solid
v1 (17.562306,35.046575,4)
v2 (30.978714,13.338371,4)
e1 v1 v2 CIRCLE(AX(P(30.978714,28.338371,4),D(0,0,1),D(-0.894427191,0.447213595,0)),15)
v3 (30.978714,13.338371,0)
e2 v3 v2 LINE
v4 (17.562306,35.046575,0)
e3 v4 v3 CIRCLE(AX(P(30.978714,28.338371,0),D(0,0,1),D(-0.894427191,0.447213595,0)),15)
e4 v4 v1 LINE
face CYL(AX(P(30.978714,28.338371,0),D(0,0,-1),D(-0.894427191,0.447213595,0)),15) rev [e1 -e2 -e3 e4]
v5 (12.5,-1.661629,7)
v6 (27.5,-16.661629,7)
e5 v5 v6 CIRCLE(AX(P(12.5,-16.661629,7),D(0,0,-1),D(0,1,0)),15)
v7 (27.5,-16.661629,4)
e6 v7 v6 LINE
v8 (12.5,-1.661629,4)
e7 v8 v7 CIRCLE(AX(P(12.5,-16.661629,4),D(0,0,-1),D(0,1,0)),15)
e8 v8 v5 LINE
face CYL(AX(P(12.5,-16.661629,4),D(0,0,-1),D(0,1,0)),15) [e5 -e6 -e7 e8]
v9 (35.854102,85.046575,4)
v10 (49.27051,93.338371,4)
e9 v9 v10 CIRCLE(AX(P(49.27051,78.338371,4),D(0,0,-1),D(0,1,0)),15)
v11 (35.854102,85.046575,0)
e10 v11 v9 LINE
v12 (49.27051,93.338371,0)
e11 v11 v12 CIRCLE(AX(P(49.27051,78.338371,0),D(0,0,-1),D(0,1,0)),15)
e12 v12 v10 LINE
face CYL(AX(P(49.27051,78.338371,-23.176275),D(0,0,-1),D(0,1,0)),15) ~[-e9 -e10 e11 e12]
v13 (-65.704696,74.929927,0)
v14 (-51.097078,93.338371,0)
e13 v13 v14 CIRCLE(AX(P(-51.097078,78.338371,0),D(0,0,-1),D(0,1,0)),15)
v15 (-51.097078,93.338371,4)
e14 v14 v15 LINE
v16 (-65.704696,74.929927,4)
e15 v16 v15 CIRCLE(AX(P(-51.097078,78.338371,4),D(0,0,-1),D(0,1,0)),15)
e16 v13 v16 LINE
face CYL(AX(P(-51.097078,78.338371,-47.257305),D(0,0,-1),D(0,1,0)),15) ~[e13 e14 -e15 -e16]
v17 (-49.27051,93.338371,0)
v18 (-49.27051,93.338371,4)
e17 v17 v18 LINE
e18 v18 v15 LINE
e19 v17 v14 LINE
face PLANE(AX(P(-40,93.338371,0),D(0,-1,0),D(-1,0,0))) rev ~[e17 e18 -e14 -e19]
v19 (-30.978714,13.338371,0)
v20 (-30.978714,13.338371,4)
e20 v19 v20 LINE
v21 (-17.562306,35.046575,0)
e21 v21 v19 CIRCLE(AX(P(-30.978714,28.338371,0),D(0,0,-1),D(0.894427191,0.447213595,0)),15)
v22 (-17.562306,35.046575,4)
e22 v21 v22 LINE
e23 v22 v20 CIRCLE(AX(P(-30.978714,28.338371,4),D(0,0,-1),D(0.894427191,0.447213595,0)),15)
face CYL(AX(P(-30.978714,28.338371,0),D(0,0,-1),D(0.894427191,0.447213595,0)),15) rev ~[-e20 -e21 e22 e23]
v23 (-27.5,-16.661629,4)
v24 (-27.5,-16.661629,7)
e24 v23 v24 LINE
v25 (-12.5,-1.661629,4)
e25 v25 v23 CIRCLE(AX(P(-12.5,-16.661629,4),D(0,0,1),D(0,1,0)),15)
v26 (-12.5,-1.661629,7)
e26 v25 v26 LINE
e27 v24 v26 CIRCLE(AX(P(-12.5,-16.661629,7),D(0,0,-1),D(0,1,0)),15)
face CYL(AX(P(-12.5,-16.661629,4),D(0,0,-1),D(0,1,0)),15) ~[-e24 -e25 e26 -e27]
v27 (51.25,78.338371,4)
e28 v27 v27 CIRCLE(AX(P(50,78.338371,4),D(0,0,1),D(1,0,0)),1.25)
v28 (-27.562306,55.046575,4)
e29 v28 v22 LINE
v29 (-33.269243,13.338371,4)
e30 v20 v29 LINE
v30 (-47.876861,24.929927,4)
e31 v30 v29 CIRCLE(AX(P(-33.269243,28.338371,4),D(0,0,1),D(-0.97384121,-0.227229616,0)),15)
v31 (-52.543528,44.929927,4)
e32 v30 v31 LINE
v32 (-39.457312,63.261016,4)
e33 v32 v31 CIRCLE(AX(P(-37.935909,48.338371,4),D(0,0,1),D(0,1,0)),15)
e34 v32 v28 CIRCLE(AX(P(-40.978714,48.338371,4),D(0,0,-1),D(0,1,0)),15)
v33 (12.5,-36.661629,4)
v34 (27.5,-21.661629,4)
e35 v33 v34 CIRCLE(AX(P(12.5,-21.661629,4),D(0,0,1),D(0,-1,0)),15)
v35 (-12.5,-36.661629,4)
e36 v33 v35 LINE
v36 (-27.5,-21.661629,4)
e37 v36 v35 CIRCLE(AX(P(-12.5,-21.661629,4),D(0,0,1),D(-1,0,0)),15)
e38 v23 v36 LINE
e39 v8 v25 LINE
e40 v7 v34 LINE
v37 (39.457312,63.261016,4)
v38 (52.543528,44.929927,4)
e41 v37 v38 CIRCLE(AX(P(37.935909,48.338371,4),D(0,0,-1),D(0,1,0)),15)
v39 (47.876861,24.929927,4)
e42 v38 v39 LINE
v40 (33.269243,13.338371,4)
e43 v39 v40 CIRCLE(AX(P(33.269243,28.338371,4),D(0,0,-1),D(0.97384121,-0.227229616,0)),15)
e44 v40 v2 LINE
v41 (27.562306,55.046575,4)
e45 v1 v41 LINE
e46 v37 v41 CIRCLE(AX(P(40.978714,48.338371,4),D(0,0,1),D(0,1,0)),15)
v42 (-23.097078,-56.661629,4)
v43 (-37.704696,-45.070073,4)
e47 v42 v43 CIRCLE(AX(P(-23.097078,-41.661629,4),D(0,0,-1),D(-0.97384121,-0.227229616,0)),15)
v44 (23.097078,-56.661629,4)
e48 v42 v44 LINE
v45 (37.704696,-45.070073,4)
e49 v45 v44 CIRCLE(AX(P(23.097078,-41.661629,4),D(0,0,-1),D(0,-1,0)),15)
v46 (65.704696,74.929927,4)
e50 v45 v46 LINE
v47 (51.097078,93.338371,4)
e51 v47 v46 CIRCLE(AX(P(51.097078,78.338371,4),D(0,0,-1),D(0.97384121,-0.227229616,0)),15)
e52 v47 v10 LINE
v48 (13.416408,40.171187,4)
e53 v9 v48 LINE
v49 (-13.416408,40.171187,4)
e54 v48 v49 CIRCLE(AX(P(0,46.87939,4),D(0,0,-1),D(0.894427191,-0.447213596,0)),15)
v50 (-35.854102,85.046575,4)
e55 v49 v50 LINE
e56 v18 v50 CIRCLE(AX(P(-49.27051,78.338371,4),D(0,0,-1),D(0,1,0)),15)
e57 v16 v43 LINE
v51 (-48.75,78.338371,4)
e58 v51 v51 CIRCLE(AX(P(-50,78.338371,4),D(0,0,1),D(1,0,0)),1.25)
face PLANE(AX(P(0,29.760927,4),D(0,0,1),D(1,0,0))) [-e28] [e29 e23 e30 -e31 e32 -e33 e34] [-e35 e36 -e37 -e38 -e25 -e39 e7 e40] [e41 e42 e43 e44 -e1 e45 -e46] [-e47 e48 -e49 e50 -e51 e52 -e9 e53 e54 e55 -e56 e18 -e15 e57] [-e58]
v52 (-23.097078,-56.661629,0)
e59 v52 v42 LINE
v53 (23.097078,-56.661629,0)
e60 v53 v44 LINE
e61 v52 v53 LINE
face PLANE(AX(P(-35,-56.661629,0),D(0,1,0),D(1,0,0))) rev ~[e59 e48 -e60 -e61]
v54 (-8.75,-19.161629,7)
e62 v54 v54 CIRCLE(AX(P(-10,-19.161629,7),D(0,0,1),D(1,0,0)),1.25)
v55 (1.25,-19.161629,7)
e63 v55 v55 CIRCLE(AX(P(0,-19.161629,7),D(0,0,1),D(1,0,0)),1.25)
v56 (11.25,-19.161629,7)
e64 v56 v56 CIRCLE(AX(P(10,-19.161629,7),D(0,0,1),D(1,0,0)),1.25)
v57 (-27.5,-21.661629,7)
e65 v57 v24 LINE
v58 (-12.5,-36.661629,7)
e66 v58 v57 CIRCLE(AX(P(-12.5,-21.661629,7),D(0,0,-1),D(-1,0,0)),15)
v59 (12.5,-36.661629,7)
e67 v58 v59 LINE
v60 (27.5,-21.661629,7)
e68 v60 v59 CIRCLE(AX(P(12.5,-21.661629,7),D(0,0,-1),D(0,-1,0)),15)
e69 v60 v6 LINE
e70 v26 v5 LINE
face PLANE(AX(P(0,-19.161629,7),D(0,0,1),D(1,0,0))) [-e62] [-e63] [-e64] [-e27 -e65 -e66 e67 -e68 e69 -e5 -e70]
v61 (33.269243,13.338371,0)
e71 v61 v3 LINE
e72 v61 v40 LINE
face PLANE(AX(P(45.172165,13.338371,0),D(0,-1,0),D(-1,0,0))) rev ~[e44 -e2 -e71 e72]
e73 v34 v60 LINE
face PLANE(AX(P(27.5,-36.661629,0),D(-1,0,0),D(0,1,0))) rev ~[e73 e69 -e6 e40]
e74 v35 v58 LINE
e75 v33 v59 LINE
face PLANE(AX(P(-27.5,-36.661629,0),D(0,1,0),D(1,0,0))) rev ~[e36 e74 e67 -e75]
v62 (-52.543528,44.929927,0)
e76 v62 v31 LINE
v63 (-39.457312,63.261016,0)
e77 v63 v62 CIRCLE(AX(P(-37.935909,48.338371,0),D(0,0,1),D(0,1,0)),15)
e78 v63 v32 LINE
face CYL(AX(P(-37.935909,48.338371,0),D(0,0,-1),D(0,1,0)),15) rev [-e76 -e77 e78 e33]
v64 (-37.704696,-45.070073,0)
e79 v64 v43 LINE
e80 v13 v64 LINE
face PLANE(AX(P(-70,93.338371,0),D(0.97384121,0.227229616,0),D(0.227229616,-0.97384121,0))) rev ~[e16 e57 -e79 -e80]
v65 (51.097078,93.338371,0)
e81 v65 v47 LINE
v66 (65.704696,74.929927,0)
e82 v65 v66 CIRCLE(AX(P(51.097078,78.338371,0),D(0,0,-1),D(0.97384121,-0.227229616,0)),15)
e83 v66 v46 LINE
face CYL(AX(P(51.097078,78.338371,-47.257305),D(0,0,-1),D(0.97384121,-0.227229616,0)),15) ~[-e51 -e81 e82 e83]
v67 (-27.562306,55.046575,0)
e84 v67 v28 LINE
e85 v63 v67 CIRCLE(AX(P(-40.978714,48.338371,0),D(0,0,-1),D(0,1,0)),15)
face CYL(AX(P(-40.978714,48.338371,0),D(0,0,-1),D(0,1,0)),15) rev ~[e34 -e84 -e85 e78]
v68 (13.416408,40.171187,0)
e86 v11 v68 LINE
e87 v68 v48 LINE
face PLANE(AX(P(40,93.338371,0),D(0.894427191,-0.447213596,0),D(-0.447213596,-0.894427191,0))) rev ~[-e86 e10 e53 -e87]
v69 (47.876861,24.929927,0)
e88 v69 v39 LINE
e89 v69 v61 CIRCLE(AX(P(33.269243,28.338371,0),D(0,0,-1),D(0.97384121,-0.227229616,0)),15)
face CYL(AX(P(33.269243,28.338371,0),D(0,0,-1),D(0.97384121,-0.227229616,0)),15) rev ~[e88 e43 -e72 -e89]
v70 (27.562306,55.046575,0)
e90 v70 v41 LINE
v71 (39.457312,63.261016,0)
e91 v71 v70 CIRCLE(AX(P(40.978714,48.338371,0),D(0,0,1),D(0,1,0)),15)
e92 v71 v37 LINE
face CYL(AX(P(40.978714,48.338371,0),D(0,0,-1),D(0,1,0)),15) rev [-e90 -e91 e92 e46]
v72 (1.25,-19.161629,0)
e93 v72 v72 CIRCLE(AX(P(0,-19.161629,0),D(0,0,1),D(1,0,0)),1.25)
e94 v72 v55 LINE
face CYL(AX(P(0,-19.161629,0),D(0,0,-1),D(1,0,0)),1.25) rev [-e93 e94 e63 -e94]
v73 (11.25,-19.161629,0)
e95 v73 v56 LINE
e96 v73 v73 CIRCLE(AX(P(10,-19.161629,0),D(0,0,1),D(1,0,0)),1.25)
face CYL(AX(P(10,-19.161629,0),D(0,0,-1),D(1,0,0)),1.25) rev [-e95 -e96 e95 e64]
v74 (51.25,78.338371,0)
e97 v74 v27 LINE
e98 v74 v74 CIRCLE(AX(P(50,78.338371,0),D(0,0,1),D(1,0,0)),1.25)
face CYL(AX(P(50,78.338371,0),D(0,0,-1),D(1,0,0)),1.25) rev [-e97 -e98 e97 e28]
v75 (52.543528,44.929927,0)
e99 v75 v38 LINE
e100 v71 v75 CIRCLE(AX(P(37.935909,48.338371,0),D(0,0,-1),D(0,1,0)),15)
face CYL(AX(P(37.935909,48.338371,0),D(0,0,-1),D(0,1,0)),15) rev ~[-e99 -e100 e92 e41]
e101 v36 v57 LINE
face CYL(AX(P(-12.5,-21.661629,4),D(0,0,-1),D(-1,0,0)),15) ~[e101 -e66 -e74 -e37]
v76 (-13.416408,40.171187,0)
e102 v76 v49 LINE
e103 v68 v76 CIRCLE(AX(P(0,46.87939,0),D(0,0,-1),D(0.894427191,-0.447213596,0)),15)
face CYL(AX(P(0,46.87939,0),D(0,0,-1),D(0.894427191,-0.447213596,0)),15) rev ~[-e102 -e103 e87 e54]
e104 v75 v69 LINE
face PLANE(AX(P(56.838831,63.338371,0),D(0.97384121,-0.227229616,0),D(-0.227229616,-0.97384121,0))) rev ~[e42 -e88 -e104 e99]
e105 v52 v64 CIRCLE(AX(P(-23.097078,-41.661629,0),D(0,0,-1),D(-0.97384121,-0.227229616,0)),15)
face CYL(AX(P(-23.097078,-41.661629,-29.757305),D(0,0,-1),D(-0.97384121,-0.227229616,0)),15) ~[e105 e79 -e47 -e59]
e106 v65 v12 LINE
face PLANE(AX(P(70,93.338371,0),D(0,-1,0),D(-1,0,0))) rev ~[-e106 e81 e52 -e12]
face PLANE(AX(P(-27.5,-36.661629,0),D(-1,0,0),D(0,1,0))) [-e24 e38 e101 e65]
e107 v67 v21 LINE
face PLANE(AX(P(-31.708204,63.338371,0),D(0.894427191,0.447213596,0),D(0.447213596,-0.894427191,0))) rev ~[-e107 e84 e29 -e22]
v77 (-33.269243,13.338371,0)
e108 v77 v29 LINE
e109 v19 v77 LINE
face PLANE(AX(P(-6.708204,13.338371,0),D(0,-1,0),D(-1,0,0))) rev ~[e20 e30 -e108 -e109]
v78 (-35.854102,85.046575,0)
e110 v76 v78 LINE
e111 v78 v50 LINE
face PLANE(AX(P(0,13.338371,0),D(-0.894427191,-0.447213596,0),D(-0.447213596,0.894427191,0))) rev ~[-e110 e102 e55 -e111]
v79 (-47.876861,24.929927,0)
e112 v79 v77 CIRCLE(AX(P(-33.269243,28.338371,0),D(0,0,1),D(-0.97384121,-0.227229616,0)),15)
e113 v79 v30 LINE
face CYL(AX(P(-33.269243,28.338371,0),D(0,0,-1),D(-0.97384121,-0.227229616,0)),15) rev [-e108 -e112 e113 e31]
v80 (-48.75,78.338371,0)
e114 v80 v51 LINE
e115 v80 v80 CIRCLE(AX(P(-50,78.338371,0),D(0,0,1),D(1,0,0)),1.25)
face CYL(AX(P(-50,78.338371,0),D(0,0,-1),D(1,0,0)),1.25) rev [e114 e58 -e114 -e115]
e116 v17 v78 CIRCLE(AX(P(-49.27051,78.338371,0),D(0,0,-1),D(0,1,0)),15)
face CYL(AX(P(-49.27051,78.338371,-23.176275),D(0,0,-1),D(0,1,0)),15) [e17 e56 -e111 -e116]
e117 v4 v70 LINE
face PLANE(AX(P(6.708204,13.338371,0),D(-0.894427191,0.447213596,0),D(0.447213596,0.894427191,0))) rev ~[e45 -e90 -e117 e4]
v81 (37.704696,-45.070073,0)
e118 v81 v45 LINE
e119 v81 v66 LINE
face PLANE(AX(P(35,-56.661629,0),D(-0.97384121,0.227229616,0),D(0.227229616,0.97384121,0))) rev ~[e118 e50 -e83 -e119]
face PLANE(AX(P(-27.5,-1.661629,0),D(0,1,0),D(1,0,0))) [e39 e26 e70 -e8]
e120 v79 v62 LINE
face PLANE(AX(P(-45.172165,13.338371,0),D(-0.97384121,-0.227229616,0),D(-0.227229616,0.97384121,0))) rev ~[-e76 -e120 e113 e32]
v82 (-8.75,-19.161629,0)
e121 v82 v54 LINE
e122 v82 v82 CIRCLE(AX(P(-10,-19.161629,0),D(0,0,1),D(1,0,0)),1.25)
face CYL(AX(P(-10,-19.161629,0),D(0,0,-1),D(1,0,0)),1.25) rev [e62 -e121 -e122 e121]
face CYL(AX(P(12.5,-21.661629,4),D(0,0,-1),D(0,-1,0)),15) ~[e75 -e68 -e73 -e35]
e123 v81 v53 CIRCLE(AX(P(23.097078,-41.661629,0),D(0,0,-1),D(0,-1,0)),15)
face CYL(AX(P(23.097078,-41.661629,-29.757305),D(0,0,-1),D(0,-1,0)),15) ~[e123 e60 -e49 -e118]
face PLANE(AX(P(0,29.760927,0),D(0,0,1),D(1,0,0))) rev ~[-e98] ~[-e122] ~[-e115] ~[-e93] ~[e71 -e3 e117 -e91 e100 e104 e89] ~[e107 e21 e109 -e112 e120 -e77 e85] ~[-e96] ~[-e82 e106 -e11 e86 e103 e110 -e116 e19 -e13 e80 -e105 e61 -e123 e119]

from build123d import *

# Parameters (mm, degrees)
F0_R        = 1.25
F0_W        = 70
F0_H        = 60
F0_W_2      = 55
F0_H_2      = 35
F1_DEPTH    = 4
F2_DEPTH    = 7
F3_T1_DEPTH = 4
F3_T3_DEPTH = 50.3525491562
F3_T5_DEPTH = 98.5146090037
F3_T7_DEPTH = 40.5
F3_T9_DEPTH = 63.5146090037


# Not quite as in the source:
# - a fillet or chamfer that OpenCascade refuses, or shapes differently, is made with other operations: its cross-section is extruded or revolved along the edge and cut away or added


with BuildPart() as f1:
    # F0 (on Top) → F1 (new body)
    with BuildSketch(Plane.XY):
        Polygon((-40, 93.3383707737), (-70, 93.3383707737), (-35, -56.6616292263), (-35, 3.3383707737), (35, 3.3383707737), (35, -56.6616292263), (70, 93.3383707737), (40, 93.3383707737), (0, 13.3383707737), align=None)
        Polygon((-45.172164613, 13.3383707737), (-56.8388312797, 63.3383707737), (-31.7082039325, 63.3383707737), (-6.7082039325, 13.3383707737), align=None, mode=Mode.SUBTRACT)
        with Locations((-50, 78.3383707737)):
            Circle(F0_R, mode=Mode.SUBTRACT)
        Polygon((6.7082039325, 13.3383707737), (31.7082039325, 63.3383707737), (56.8388312797, 63.3383707737), (45.172164613, 13.3383707737), align=None, mode=Mode.SUBTRACT)
        with Locations((50, 78.3383707737)):
            Circle(F0_R, mode=Mode.SUBTRACT)
        with Locations((0, -26.6616292263)):
            Rectangle(F0_W, F0_H)
        with Locations((0, -19.1616292263)):
            Rectangle(F0_W_2, F0_H_2, mode=Mode.SUBTRACT)
        with Locations((0, -19.1616292263)):
            Rectangle(F0_W_2, F0_H_2)
        with Locations((-10, -19.1616292263)):
            Circle(F0_R, mode=Mode.SUBTRACT)
        with Locations((0, -19.1616292263)):
            Circle(F0_R, mode=Mode.SUBTRACT)
        with Locations((10, -19.1616292263)):
            Circle(F0_R, mode=Mode.SUBTRACT)
    extrude(amount=F1_DEPTH)

    # F0 (on Top) → F2 (join)
    with BuildSketch(Plane.XY):
        with Locations((0, -19.1616292263)):
            Rectangle(F0_W_2, F0_H_2)
        with Locations((-10, -19.1616292263)):
            Circle(F0_R, mode=Mode.SUBTRACT)
        with Locations((0, -19.1616292263)):
            Circle(F0_R, mode=Mode.SUBTRACT)
        with Locations((10, -19.1616292263)):
            Circle(F0_R, mode=Mode.SUBTRACT)
    extrude(amount=F2_DEPTH)

    # F3: fillet of radius 15 on 19 edges, made by hand

    # F3_s2 → F3_t1 (join)
    with BuildSketch(Plane.XY):
        with BuildLine():
            ThreePointArc((13.416407865, 40.1711865037), (0, 31.8793904362), (-13.416407865, 40.1711865037))
            Line((-13.416407865, 40.1711865037), (0, 13.3383707737))
            Line((0, 13.3383707737), (13.416407865, 40.1711865037))
        make_face()
        with BuildLine():
            ThreePointArc((17.5623058987, 35.0465747062), (18.2189516385, 20.452404092), (30.9787137637, 13.3383707737))
            Line((30.9787137637, 13.3383707737), (6.7082039325, 13.3383707737))
            Line((6.7082039325, 13.3383707737), (17.5623058987, 35.0465747062))
        make_face()
        with BuildLine():
            ThreePointArc((47.8768609584, 24.9299265396), (42.5932263089, 16.5883353799), (33.2692428123, 13.3383707737))
            Line((33.2692428123, 13.3383707737), (45.172164613, 13.3383707737))
            Line((45.172164613, 13.3383707737), (47.8768609584, 24.9299265396))
        make_face()
        with BuildLine():
            ThreePointArc((-17.5623058987, 35.0465747062), (-18.2189516385, 20.452404092), (-30.9787137637, 13.3383707737))
            Line((-30.9787137637, 13.3383707737), (-6.7082039325, 13.3383707737))
            Line((-6.7082039325, 13.3383707737), (-17.5623058987, 35.0465747062))
        make_face()
        with BuildLine():
            ThreePointArc((-47.8768609584, 24.9299265396), (-42.5932263089, 16.5883353799), (-33.2692428123, 13.3383707737))
            Line((-33.2692428123, 13.3383707737), (-45.172164613, 13.3383707737))
            Line((-45.172164613, 13.3383707737), (-47.8768609584, 24.9299265396))
        make_face()
        with BuildLine():
            ThreePointArc((-37.935909479, 63.3383707737), (-49.6859448728, 57.6623542703), (-52.5435276251, 44.9299265396))
            Line((-52.5435276251, 44.9299265396), (-56.8388312797, 63.3383707737))
            Line((-56.8388312797, 63.3383707737), (-37.935909479, 63.3383707737))
        make_face()
        with BuildLine():
            ThreePointArc((-40.9787137637, 63.3383707737), (-33.092747082, 61.098132899), (-27.5623058987, 55.0465747062))
            Line((-27.5623058987, 55.0465747062), (-31.7082039325, 63.3383707737))
            Line((-31.7082039325, 63.3383707737), (-40.9787137637, 63.3383707737))
        make_face()
        with BuildLine():
            ThreePointArc((40.9787137637, 63.3383707737), (33.092747082, 61.098132899), (27.5623058987, 55.0465747062))
            Line((27.5623058987, 55.0465747062), (31.7082039325, 63.3383707737))
            Line((31.7082039325, 63.3383707737), (40.9787137637, 63.3383707737))
        make_face()
        with BuildLine():
            ThreePointArc((37.935909479, 63.3383707737), (49.6859448728, 57.6623542703), (52.5435276251, 44.9299265396))
            Line((52.5435276251, 44.9299265396), (56.8388312797, 63.3383707737))
            Line((56.8388312797, 63.3383707737), (37.935909479, 63.3383707737))
        make_face()
    extrude(amount=F3_T1_DEPTH)

    # F3_s4 → F3_t3 (cut)
    with BuildSketch(Plane.XY.offset(-23.1762745781)):
        with BuildLine():
            ThreePointArc((49.2705098312, 93.3383707737), (41.3845431495, 91.098132899), (35.8541019662, 85.0465747062))
            Line((35.8541019662, 85.0465747062), (40, 93.3383707737))
            Line((40, 93.3383707737), (49.2705098312, 93.3383707737))
        make_face()
        with BuildLine():
            ThreePointArc((-49.2705098312, 93.3383707737), (-41.3845431495, 91.098132899), (-35.8541019662, 85.0465747062))
            Line((-35.8541019662, 85.0465747062), (-40, 93.3383707737))
            Line((-40, 93.3383707737), (-49.2705098312, 93.3383707737))
        make_face()
    extrude(amount=F3_T3_DEPTH, mode=Mode.SUBTRACT)

    # F3_s6 → F3_t5 (cut)
    with BuildSketch(Plane.XY.offset(-47.2573045019)):
        with BuildLine():
            ThreePointArc((65.7046963454, 74.9299265396), (62.8471135931, 87.6623542703), (51.0970781993, 93.3383707737))
            Line((51.0970781993, 93.3383707737), (70, 93.3383707737))
            Line((70, 93.3383707737), (65.7046963454, 74.9299265396))
        make_face()
        with BuildLine():
            ThreePointArc((-51.0970781993, 93.3383707737), (-62.8471135931, 87.6623542703), (-65.7046963454, 74.9299265396))
            Line((-65.7046963454, 74.9299265396), (-70, 93.3383707737))
            Line((-70, 93.3383707737), (-51.0970781993, 93.3383707737))
        make_face()
    extrude(amount=F3_T5_DEPTH, mode=Mode.SUBTRACT)

    # F3_s8 → F3_t7 (cut)
    with BuildSketch(Plane.XY.offset(4)):
        with BuildLine():
            ThreePointArc((12.5, -1.6616292263), (23.1066017178, -6.0550275085), (27.5, -16.6616292263))
            Line((27.5, -16.6616292263), (27.5, -1.6616292263))
            Line((27.5, -1.6616292263), (12.5, -1.6616292263))
        make_face()
        with BuildLine():
            ThreePointArc((-12.5, -1.6616292263), (-23.1066017178, -6.0550275085), (-27.5, -16.6616292263))
            Line((-27.5, -16.6616292263), (-27.5, -1.6616292263))
            Line((-27.5, -1.6616292263), (-12.5, -1.6616292263))
        make_face()
        with BuildLine():
            ThreePointArc((12.5, -36.6616292263), (23.1066017178, -32.2682309441), (27.5, -21.6616292263))
            Line((27.5, -21.6616292263), (27.5, -36.6616292263))
            Line((27.5, -36.6616292263), (12.5, -36.6616292263))
        make_face()
        with BuildLine():
            ThreePointArc((-27.5, -21.6616292263), (-23.1066017178, -32.2682309441), (-12.5, -36.6616292263))
            Line((-12.5, -36.6616292263), (-27.5, -36.6616292263))
            Line((-27.5, -36.6616292263), (-27.5, -21.6616292263))
        make_face()
    extrude(amount=F3_T7_DEPTH, mode=Mode.SUBTRACT)

    # F3_s10 → F3_t9 (cut)
    with BuildSketch(Plane.XY.offset(-29.7573045019)):
        with BuildLine():
            ThreePointArc((-37.7046963454, -45.0700734604), (-32.4210616958, -53.4116646201), (-23.0970781993, -56.6616292263))
            Line((-23.0970781993, -56.6616292263), (-35, -56.6616292263))
            Line((-35, -56.6616292263), (-37.7046963454, -45.0700734604))
        make_face()
        with BuildLine():
            ThreePointArc((23.0970781993, -56.6616292263), (32.4210616958, -53.4116646201), (37.7046963454, -45.0700734604))
            Line((37.7046963454, -45.0700734604), (35, -56.6616292263))
            Line((35, -56.6616292263), (23.0970781993, -56.6616292263))
        make_face()
    extrude(amount=F3_T9_DEPTH, mode=Mode.SUBTRACT)


solid = f1.part
